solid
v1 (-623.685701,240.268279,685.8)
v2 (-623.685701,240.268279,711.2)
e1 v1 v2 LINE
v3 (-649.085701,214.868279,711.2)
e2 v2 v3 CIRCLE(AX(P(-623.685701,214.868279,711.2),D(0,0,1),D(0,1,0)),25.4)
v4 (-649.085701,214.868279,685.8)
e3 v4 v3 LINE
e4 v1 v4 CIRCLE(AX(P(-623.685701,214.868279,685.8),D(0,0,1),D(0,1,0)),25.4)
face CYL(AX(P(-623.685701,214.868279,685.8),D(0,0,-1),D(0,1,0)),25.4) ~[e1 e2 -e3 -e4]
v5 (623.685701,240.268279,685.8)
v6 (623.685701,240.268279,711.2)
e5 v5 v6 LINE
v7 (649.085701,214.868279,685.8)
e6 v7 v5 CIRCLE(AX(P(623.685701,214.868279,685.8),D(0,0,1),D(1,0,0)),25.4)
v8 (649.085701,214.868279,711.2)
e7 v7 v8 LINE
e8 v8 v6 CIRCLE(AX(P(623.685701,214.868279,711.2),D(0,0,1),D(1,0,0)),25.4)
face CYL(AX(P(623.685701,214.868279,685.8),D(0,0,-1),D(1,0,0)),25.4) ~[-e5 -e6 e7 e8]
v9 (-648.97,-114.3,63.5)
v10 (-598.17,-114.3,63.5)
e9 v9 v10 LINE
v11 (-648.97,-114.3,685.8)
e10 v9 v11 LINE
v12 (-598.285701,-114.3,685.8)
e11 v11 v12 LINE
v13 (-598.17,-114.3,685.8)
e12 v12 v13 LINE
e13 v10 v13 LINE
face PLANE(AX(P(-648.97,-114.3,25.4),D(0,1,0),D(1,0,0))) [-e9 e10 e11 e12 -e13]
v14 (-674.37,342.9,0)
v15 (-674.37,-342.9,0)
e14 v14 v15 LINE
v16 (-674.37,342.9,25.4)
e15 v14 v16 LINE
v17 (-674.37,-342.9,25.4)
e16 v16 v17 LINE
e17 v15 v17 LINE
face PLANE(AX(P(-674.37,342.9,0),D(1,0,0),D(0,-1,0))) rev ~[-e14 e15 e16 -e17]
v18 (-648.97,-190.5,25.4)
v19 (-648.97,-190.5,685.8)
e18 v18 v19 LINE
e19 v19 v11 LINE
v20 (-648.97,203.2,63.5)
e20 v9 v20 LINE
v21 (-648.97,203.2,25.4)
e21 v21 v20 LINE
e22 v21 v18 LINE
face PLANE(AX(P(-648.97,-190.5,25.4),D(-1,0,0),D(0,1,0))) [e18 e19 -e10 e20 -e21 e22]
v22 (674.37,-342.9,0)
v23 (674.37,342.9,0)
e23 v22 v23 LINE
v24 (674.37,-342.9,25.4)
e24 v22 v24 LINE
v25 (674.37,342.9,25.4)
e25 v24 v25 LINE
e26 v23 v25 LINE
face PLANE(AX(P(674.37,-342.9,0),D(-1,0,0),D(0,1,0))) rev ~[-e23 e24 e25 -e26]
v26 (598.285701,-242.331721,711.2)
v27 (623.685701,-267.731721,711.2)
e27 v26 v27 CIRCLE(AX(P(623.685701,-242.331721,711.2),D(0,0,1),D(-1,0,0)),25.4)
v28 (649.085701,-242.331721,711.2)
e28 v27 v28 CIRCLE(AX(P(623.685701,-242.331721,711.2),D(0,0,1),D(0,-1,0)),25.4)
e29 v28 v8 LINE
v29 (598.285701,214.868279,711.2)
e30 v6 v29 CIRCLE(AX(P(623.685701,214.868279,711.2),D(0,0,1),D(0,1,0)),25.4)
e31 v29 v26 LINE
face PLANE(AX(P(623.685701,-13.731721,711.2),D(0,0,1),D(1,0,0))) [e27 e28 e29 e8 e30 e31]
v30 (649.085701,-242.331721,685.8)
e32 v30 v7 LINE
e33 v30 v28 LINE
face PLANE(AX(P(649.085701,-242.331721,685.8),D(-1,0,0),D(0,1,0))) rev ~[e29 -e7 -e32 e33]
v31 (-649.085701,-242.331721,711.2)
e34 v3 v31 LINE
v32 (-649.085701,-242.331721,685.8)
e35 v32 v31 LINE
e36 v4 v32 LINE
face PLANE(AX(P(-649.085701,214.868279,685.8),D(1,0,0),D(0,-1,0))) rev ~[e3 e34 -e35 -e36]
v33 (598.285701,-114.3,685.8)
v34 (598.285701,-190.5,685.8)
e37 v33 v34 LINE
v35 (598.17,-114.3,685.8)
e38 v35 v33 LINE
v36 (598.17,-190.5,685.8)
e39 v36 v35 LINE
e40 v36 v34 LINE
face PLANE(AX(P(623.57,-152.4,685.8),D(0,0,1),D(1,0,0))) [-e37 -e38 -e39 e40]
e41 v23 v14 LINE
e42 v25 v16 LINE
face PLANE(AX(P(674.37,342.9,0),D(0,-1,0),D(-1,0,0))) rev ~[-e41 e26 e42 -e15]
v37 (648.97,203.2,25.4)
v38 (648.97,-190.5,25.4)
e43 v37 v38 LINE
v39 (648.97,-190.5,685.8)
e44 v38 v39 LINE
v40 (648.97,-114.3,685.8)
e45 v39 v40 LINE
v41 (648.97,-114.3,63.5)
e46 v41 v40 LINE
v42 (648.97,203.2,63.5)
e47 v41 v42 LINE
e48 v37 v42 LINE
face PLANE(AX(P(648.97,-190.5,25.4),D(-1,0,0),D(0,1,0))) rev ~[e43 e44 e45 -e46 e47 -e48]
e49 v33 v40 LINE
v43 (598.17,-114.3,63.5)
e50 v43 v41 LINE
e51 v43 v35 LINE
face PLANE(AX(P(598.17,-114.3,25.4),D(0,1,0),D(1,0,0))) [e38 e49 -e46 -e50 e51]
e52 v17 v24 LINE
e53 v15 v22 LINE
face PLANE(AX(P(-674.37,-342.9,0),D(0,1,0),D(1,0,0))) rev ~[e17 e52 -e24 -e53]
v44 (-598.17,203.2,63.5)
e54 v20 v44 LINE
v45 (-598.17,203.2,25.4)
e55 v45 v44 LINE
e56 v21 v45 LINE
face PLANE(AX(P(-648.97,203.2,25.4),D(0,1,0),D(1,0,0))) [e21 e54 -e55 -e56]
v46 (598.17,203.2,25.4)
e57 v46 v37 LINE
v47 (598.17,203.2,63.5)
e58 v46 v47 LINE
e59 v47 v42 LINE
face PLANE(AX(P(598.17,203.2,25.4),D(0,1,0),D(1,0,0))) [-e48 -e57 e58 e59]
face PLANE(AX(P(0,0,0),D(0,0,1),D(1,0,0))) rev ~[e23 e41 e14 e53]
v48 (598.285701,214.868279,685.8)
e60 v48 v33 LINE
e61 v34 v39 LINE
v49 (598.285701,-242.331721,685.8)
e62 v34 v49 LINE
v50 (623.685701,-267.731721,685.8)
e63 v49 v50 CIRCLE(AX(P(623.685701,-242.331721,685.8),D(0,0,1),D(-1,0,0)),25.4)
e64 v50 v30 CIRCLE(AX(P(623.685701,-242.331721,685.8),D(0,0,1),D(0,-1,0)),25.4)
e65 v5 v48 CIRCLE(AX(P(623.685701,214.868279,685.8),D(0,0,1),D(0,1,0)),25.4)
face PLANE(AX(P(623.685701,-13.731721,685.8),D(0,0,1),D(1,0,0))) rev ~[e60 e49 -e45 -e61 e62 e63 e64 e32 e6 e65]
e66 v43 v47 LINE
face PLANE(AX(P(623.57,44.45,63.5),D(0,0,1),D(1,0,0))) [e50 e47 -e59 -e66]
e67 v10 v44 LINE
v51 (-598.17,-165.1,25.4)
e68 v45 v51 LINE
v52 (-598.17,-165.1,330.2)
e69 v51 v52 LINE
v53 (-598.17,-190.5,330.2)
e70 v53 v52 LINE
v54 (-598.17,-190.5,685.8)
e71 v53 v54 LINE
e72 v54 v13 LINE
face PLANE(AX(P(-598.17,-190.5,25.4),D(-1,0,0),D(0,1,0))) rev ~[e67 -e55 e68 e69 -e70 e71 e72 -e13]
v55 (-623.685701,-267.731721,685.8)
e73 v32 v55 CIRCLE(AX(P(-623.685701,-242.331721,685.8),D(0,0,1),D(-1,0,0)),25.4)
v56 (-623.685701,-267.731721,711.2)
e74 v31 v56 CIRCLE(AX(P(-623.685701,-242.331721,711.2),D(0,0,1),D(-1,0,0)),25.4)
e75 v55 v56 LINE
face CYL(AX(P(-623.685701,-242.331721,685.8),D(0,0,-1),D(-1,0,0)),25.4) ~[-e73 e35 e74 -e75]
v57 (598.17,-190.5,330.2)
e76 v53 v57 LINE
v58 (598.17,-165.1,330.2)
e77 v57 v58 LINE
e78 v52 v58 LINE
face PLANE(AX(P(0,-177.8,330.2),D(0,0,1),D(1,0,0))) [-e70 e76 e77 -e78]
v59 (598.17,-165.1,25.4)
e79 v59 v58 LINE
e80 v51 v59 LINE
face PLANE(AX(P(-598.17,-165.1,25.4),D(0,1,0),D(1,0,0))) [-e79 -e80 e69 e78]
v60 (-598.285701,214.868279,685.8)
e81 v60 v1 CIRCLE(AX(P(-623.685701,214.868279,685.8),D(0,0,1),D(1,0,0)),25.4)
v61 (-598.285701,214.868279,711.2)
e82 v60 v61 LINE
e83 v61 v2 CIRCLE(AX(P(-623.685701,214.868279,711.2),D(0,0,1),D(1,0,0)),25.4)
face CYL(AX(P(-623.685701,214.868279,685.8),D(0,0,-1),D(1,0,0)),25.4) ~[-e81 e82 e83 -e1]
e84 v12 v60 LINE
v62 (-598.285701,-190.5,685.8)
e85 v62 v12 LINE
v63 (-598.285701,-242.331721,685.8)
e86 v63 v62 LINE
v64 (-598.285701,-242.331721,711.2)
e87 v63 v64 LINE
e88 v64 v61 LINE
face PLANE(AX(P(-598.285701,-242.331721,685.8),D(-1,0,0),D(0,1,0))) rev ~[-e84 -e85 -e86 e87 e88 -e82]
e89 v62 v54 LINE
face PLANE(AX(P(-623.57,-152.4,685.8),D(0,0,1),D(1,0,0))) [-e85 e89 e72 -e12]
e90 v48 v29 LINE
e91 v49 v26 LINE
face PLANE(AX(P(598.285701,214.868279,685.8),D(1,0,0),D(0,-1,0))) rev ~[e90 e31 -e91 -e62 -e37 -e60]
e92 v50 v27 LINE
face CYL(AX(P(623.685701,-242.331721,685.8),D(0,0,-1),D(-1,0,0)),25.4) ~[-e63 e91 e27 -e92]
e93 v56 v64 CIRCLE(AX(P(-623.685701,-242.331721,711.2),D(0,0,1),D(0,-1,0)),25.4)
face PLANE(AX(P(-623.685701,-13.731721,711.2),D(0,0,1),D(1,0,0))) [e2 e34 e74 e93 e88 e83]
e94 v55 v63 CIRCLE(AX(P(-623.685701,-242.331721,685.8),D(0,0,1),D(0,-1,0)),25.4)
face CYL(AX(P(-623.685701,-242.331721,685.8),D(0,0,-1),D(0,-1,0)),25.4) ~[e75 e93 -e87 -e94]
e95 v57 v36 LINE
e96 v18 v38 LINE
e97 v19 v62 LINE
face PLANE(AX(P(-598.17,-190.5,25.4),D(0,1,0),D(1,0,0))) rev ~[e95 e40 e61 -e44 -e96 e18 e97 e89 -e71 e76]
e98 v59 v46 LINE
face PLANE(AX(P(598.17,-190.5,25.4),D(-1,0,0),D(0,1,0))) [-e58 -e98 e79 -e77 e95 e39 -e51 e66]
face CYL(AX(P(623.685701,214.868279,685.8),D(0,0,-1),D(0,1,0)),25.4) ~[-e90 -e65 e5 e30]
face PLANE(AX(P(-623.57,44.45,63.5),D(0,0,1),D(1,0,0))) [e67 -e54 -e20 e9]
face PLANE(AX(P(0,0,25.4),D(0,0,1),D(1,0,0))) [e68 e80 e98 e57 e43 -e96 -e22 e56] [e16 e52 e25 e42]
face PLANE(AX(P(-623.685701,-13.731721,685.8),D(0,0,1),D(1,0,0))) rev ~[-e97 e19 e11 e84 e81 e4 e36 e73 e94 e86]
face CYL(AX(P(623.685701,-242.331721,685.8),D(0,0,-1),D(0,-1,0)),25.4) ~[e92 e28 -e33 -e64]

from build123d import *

# Parameters (mm, degrees)
F1_DEPTH = 25.4
F2_W     = 50.8
F2_H     = 317.5
F3_DEPTH = 38.1
F4_W     = 50.8
F4_H     = 76.2
F5_DEPTH = 660.4
F7_DEPTH = 25.4
F8_W     = 1196.34
F8_H     = 25.4
F9_DEPTH = 304.8


# Not quite as in the source:
# - a feature names something its author has since deleted; it is built from what else it names


with BuildPart() as f1:
    # F0 (on Top) → F1 (new body)
    with BuildSketch(Plane.XY):
        Polygon((-674.37, -342.9), (674.37, -342.9), (674.37, 342.9), (-674.37, 342.9), (-674.37, -114.3), align=None)
    extrude(amount=F1_DEPTH)

    # F2 (on face) → F3 (join)
    with BuildSketch(Plane.XY.offset(25.4)):
        with Locations((-623.57, 44.45)):
            Rectangle(F2_W, F2_H)
        with Locations((623.57, 44.45)):
            Rectangle(F2_W, F2_H)
    extrude(amount=F3_DEPTH)

    # F4 (on face) → F5 (join)
    with BuildSketch(Plane.XY.offset(25.4)):
        with Locations((-623.57, -152.4)):
            Rectangle(F4_W, F4_H)
        with Locations((623.57, -152.4)):
            Rectangle(F4_W, F4_H)
    extrude(amount=F5_DEPTH)

    # F6 (on face) → F7 (join)
    with BuildSketch(Plane.XY.offset(685.8)):
        with BuildLine():
            ThreePointArc((-623.6857005119, -267.7317205817), (-605.7251882698, -260.2922328238), (-598.2857005119, -242.3317205817))
            Line((-598.2857005119, -242.3317205817), (-598.2857005119, 214.8682794183))
            ThreePointArc((-598.2857005119, 214.8682794183), (-605.7251882698, 232.8287916605), (-623.6857005119, 240.2682794183))
            ThreePointArc((-623.6857005119, 240.2682794183), (-641.6462127541, 232.8287916605), (-649.0857005119, 214.8682794183))
            Line((-649.0857005119, 214.8682794183), (-649.0857005119, -242.3317205817))
            ThreePointArc((-649.0857005119, -242.3317205817), (-641.6462127541, -260.2922328238), (-623.6857005119, -267.7317205817))
        make_face()
        with BuildLine():
            ThreePointArc((623.6857005119, -267.7317205817), (641.6462127541, -260.2922328238), (649.0857005119, -242.3317205817))
            Line((649.0857005119, -242.3317205817), (649.0857005119, 214.8682794183))
            ThreePointArc((649.0857005119, 214.8682794183), (641.6462127541, 232.8287916605), (623.6857005119, 240.2682794183))
            ThreePointArc((623.6857005119, 240.2682794183), (605.7251882698, 232.8287916605), (598.2857005119, 214.8682794183))
            Line((598.2857005119, 214.8682794183), (598.2857005119, -242.3317205817))
            ThreePointArc((598.2857005119, -242.3317205817), (605.7251882698, -260.2922328238), (623.6857005119, -267.7317205817))
        make_face()
    extrude(amount=F7_DEPTH)

    # F8 (on face) → F9 (join)
    with BuildSketch(Plane.XY.offset(25.4)):
        with Locations((0, -177.8)):
            Rectangle(F8_W, F8_H)
    extrude(amount=F9_DEPTH)


solid = f1.part
